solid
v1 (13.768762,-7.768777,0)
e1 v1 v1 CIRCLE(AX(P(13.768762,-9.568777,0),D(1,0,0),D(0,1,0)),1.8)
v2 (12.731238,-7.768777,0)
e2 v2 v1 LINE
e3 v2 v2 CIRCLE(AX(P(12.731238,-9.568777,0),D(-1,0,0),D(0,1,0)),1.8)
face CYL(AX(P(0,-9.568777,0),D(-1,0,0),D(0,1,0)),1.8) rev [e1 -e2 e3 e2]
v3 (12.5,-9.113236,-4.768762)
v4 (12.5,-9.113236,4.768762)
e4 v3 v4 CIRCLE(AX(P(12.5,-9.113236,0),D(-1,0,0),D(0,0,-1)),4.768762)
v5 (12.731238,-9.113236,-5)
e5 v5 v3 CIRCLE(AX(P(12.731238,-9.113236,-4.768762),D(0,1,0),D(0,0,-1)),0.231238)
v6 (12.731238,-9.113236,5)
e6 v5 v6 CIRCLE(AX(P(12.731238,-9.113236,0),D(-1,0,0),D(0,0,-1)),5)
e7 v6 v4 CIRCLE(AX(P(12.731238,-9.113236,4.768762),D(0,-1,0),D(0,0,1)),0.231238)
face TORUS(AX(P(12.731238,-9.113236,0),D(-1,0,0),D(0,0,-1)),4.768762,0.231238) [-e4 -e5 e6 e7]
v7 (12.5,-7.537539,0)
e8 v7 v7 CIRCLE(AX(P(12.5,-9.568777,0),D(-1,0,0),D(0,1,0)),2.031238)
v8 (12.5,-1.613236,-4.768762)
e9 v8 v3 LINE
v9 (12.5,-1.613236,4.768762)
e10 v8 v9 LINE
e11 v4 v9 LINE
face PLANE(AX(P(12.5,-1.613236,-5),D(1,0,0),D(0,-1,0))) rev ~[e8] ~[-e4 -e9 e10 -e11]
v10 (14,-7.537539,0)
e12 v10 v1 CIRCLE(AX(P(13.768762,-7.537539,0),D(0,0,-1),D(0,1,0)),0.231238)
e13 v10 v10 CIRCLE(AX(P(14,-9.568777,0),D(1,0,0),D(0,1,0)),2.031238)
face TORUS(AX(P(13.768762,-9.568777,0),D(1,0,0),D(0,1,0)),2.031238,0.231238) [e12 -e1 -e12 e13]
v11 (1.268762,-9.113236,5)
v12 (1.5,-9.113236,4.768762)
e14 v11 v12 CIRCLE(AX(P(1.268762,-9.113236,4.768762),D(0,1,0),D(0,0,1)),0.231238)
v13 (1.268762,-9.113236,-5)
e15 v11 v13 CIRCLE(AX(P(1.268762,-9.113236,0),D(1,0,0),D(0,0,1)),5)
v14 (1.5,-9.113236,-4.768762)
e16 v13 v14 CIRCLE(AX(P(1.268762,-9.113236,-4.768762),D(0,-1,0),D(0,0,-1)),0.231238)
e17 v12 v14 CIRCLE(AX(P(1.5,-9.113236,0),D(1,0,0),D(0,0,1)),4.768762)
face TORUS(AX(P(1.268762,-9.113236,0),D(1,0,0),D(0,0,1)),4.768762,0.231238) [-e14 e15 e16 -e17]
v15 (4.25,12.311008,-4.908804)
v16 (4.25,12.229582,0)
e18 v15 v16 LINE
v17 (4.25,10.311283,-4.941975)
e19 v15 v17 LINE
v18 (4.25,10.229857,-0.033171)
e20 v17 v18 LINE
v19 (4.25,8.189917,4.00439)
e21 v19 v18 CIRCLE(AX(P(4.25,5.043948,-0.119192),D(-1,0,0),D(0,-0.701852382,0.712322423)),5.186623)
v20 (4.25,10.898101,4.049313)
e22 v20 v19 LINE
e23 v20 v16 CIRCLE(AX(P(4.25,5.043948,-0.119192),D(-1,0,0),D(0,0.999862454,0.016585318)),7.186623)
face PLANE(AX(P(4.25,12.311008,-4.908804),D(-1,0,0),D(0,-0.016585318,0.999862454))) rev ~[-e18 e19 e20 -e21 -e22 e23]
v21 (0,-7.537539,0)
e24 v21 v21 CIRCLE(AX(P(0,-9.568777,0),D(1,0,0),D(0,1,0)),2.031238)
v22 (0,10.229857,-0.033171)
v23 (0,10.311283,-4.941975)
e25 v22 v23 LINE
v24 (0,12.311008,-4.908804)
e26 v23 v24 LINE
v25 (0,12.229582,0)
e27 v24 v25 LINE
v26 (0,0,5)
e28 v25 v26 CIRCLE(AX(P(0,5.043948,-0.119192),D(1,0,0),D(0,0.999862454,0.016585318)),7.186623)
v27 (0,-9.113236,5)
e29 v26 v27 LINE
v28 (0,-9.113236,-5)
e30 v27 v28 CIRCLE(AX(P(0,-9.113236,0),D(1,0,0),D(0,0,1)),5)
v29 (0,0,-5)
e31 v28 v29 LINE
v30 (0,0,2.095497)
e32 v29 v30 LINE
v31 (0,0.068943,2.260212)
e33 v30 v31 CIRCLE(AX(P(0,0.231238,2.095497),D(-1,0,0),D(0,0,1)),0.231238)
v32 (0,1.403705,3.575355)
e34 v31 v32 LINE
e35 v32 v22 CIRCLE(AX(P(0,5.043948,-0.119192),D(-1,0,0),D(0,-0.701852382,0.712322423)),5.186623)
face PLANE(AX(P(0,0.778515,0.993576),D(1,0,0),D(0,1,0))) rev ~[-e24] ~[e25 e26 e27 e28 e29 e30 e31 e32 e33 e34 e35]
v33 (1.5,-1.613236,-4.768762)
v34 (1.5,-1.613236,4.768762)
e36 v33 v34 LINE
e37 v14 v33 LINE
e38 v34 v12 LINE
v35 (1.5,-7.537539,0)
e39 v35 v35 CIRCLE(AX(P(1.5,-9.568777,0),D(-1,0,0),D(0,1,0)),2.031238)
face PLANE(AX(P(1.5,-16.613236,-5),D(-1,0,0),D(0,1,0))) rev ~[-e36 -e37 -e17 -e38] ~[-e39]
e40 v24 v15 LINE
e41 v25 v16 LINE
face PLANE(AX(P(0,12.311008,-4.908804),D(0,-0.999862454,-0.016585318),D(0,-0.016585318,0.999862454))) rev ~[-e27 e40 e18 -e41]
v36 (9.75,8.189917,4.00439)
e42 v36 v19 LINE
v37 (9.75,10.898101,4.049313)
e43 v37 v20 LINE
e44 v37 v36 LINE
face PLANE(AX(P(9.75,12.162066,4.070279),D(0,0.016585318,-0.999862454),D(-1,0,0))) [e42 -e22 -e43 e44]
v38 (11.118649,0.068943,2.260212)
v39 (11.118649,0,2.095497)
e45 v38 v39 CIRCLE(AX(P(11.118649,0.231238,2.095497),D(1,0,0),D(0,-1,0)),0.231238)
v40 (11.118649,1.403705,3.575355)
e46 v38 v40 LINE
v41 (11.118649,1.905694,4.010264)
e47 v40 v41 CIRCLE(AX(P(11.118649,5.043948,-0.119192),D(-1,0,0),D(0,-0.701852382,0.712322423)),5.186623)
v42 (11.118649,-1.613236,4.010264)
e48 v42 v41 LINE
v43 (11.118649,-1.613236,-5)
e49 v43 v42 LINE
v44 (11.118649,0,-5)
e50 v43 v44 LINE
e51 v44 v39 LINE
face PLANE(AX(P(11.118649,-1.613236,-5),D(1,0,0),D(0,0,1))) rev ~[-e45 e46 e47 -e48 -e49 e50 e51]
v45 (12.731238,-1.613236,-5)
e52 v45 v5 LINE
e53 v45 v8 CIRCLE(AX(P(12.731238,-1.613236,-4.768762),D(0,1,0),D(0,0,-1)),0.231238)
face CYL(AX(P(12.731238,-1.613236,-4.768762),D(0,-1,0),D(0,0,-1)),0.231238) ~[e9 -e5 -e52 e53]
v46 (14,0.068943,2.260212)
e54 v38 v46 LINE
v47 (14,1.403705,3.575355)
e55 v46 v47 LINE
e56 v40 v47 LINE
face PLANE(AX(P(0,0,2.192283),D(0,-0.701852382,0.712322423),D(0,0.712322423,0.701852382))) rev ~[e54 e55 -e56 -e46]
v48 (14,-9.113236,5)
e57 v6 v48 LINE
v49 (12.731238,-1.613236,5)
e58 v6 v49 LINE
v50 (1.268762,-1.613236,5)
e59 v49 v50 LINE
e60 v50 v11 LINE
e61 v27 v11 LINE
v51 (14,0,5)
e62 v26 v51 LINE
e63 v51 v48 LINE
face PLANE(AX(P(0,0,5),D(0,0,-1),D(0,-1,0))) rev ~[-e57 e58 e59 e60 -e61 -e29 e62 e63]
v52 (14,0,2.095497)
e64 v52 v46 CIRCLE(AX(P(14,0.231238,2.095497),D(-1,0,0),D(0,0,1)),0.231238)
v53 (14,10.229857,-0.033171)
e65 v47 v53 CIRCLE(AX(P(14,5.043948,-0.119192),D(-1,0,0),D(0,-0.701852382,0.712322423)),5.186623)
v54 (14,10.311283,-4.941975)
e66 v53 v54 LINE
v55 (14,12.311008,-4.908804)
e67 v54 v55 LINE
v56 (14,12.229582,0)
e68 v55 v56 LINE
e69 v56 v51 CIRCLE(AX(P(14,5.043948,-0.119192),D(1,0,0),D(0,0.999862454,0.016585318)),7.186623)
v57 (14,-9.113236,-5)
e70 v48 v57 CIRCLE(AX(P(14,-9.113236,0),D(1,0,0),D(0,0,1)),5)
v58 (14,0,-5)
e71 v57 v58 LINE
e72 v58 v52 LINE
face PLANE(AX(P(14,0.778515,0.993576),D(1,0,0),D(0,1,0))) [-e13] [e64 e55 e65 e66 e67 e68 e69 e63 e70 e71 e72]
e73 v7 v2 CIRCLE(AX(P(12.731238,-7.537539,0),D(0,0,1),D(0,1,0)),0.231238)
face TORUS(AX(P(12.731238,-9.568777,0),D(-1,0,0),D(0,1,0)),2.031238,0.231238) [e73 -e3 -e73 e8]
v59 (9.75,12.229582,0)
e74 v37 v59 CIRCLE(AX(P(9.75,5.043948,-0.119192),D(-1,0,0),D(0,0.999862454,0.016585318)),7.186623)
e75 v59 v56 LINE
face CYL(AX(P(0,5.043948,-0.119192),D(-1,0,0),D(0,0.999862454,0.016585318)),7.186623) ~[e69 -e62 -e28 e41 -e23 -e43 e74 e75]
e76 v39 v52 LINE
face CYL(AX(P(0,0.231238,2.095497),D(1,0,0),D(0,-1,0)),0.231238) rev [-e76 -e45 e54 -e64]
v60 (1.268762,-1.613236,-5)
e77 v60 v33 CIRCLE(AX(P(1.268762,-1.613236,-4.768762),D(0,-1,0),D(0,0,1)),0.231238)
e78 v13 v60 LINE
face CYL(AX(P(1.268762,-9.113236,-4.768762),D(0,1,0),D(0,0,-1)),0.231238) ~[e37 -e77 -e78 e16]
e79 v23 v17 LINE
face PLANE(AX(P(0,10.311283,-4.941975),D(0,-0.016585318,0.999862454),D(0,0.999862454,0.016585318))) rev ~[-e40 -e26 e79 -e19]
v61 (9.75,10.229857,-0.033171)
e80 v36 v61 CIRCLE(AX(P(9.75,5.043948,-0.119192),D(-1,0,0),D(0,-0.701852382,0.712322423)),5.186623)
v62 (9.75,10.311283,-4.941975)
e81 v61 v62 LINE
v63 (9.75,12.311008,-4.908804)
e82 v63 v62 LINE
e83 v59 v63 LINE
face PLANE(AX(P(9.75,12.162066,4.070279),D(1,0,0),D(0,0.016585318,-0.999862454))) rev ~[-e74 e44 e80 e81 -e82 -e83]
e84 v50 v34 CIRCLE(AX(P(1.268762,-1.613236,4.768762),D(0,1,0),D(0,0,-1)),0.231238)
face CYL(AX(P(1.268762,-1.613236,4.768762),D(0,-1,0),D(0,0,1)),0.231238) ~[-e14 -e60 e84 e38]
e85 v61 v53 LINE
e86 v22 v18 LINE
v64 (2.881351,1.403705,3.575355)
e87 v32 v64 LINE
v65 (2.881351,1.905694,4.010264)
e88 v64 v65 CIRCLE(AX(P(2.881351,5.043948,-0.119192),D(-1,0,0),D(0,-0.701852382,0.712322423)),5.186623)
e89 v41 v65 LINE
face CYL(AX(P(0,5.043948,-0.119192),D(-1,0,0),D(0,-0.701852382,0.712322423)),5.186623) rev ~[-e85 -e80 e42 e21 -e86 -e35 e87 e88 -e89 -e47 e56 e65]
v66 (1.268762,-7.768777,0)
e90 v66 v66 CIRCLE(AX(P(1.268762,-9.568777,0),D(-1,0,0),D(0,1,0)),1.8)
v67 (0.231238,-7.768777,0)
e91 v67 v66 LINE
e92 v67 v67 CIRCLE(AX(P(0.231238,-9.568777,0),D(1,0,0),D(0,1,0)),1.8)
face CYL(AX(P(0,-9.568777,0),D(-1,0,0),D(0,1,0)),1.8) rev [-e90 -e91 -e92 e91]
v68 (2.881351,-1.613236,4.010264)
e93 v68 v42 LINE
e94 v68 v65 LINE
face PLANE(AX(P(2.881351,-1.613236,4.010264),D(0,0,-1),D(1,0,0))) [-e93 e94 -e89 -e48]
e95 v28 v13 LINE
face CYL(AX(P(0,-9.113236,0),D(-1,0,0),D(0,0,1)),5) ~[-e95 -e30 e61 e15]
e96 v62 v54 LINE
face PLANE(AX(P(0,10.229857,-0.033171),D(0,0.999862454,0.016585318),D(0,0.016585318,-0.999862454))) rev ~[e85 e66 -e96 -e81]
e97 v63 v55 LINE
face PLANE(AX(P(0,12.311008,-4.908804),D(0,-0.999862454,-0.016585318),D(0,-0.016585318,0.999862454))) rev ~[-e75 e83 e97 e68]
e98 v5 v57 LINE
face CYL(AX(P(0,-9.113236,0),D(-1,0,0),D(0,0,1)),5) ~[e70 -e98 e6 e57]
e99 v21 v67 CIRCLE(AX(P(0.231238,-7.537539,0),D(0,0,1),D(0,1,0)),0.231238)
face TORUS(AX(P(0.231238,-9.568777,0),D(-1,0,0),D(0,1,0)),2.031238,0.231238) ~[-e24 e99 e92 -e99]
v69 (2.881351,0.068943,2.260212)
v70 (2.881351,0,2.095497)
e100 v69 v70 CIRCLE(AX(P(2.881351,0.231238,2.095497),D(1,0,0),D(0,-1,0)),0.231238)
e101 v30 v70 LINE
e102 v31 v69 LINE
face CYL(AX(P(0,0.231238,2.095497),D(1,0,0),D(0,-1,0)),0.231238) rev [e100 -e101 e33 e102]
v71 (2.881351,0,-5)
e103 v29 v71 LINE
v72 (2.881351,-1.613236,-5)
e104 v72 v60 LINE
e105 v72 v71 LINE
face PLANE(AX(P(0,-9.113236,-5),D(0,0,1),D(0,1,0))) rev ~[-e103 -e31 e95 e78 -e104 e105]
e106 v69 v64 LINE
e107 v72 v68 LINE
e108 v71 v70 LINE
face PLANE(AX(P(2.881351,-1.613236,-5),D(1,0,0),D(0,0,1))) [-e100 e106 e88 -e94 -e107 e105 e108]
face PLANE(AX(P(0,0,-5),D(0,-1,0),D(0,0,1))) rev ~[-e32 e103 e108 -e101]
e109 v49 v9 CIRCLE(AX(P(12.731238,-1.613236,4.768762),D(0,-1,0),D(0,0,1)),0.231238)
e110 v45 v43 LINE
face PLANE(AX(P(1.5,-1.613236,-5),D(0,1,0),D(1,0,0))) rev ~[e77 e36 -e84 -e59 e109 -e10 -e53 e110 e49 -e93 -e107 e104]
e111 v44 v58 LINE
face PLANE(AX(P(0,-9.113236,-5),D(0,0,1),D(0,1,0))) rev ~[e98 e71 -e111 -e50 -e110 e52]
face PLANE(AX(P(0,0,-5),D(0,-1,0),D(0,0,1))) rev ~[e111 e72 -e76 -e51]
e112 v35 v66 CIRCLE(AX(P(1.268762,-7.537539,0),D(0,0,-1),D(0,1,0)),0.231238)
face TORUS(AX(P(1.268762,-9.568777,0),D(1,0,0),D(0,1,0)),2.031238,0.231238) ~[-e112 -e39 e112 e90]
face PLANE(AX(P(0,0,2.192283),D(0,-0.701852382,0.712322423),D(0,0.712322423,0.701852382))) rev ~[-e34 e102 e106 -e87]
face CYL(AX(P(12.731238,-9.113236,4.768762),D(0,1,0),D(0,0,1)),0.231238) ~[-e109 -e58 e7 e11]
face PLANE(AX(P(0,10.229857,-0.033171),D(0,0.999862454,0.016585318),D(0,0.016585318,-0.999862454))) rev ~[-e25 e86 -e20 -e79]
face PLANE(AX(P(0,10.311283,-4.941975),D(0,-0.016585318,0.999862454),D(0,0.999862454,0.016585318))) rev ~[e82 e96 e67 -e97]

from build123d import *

# Parameters (mm, degrees)
F0_R     = 1.8
F1_DEPTH = 14
F2_W     = 5.5
F2_H     = 4.0708386075
F2_H_2   = 4.9094793208
F3_DEPTH = 5
F4_W     = 11
F4_H     = 7.5
F5_DEPTH = 12
F6_R     = 0.2312376478
F7_W     = 8.2372972146
F7_H     = 9.0102642961
F8_DEPTH = 5


# Not quite as in the source:
# - a feature names something its author has since deleted; it is built from what else it names


with BuildPart() as f1:
    # F0 (on Right) → F1 (new body)
    with BuildSketch(Plane.YZ):
        with BuildLine():
            Line((-9.1132364464, -5), (0, -5))
            Line((0, -5), (0, 2.1922827341))
            Line((0, 2.1922827341), (1.4037047395, 3.5753551798))
            ThreePointArc((1.4037047395, 3.5753551798), (7.0067613017, 4.6816844814), (10.2298574217, -0.0331706346))
            Line((10.2298574217, -0.0331706346), (10.3112826954, -4.9419746769))
            Line((10.3112826954, -4.9419746769), (12.3110075686, -4.9088040424))
            Line((12.3110075686, -4.9088040424), (12.2295822948, 0))
            ThreePointArc((12.2295822948, 0), (7.7636365241, 6.5329380451), (0, 5))
            Line((0, 5), (-9.1132364464, 5))
            ThreePointArc((-9.1132364464, 5), (-14.1132364464, 0), (-9.1132364464, -5))
        make_face()
        with Locations((-9.5687768728, 0)):
            Circle(F0_R, mode=Mode.SUBTRACT)
    extrude(amount=F1_DEPTH)

    # F2 (on face) → F3 (cut)
    with BuildSketch(Plane(origin=(0, 12.2262182699, 0.2028036077), x_dir=(-1, 0, 0), z_dir=(0, 0.9998624542, 0.0165853176))):
        with Locations((-7, 1.8325877974)):
            Rectangle(F2_W, F2_H)
        with Locations((-7, -2.6575711668)):
            Rectangle(F2_W, F2_H_2)
    extrude(amount=-F3_DEPTH, mode=Mode.SUBTRACT)

    # F4 (on face) → F5 (cut)
    with BuildSketch(Plane(origin=(0, 0, -5), x_dir=(1, 0, 0), z_dir=(0, 0, -1))):
        with Locations((7, 5.3632364464)):
            Rectangle(F4_W, F4_H)
        with Locations((7, 12.8632364464)):
            Rectangle(F4_W, F4_H)
    extrude(amount=-F5_DEPTH, mode=Mode.SUBTRACT)

    # F6
    f6_edges = [f1.edges().sort_by_distance(p)[0] for p in [
        (1.5, -11.368777, 0),
        (12.5, -11.368777, 0),
        (0, -11.368777, 0),
        (14, -11.368777, 0),
        (7, 0, 2.192283),
        (12.5, -5.363236, -5),
        (1.5, -5.363236, -5),
        (12.5, -14.113236, 0),
        (12.5, -5.363236, 5),
        (1.5, -5.363236, 5),
        (1.5, -14.113236, 0),
    ]]
    fillet(f6_edges, radius=F6_R)

    # F7 (on face) → F8 (cut)
    with BuildSketch(Plane.XZ.offset(1.6132364464)):
        with Locations((7, -0.494867852)):
            Rectangle(F7_W, F7_H)
    extrude(amount=-F8_DEPTH, mode=Mode.SUBTRACT)


with BuildPart() as f9_1:
    # F9: copy of F1
    add(f1.part)


with BuildPart() as f11_1:
    # F11: copy of F1
    add(f1.part)


solid = f1.part
